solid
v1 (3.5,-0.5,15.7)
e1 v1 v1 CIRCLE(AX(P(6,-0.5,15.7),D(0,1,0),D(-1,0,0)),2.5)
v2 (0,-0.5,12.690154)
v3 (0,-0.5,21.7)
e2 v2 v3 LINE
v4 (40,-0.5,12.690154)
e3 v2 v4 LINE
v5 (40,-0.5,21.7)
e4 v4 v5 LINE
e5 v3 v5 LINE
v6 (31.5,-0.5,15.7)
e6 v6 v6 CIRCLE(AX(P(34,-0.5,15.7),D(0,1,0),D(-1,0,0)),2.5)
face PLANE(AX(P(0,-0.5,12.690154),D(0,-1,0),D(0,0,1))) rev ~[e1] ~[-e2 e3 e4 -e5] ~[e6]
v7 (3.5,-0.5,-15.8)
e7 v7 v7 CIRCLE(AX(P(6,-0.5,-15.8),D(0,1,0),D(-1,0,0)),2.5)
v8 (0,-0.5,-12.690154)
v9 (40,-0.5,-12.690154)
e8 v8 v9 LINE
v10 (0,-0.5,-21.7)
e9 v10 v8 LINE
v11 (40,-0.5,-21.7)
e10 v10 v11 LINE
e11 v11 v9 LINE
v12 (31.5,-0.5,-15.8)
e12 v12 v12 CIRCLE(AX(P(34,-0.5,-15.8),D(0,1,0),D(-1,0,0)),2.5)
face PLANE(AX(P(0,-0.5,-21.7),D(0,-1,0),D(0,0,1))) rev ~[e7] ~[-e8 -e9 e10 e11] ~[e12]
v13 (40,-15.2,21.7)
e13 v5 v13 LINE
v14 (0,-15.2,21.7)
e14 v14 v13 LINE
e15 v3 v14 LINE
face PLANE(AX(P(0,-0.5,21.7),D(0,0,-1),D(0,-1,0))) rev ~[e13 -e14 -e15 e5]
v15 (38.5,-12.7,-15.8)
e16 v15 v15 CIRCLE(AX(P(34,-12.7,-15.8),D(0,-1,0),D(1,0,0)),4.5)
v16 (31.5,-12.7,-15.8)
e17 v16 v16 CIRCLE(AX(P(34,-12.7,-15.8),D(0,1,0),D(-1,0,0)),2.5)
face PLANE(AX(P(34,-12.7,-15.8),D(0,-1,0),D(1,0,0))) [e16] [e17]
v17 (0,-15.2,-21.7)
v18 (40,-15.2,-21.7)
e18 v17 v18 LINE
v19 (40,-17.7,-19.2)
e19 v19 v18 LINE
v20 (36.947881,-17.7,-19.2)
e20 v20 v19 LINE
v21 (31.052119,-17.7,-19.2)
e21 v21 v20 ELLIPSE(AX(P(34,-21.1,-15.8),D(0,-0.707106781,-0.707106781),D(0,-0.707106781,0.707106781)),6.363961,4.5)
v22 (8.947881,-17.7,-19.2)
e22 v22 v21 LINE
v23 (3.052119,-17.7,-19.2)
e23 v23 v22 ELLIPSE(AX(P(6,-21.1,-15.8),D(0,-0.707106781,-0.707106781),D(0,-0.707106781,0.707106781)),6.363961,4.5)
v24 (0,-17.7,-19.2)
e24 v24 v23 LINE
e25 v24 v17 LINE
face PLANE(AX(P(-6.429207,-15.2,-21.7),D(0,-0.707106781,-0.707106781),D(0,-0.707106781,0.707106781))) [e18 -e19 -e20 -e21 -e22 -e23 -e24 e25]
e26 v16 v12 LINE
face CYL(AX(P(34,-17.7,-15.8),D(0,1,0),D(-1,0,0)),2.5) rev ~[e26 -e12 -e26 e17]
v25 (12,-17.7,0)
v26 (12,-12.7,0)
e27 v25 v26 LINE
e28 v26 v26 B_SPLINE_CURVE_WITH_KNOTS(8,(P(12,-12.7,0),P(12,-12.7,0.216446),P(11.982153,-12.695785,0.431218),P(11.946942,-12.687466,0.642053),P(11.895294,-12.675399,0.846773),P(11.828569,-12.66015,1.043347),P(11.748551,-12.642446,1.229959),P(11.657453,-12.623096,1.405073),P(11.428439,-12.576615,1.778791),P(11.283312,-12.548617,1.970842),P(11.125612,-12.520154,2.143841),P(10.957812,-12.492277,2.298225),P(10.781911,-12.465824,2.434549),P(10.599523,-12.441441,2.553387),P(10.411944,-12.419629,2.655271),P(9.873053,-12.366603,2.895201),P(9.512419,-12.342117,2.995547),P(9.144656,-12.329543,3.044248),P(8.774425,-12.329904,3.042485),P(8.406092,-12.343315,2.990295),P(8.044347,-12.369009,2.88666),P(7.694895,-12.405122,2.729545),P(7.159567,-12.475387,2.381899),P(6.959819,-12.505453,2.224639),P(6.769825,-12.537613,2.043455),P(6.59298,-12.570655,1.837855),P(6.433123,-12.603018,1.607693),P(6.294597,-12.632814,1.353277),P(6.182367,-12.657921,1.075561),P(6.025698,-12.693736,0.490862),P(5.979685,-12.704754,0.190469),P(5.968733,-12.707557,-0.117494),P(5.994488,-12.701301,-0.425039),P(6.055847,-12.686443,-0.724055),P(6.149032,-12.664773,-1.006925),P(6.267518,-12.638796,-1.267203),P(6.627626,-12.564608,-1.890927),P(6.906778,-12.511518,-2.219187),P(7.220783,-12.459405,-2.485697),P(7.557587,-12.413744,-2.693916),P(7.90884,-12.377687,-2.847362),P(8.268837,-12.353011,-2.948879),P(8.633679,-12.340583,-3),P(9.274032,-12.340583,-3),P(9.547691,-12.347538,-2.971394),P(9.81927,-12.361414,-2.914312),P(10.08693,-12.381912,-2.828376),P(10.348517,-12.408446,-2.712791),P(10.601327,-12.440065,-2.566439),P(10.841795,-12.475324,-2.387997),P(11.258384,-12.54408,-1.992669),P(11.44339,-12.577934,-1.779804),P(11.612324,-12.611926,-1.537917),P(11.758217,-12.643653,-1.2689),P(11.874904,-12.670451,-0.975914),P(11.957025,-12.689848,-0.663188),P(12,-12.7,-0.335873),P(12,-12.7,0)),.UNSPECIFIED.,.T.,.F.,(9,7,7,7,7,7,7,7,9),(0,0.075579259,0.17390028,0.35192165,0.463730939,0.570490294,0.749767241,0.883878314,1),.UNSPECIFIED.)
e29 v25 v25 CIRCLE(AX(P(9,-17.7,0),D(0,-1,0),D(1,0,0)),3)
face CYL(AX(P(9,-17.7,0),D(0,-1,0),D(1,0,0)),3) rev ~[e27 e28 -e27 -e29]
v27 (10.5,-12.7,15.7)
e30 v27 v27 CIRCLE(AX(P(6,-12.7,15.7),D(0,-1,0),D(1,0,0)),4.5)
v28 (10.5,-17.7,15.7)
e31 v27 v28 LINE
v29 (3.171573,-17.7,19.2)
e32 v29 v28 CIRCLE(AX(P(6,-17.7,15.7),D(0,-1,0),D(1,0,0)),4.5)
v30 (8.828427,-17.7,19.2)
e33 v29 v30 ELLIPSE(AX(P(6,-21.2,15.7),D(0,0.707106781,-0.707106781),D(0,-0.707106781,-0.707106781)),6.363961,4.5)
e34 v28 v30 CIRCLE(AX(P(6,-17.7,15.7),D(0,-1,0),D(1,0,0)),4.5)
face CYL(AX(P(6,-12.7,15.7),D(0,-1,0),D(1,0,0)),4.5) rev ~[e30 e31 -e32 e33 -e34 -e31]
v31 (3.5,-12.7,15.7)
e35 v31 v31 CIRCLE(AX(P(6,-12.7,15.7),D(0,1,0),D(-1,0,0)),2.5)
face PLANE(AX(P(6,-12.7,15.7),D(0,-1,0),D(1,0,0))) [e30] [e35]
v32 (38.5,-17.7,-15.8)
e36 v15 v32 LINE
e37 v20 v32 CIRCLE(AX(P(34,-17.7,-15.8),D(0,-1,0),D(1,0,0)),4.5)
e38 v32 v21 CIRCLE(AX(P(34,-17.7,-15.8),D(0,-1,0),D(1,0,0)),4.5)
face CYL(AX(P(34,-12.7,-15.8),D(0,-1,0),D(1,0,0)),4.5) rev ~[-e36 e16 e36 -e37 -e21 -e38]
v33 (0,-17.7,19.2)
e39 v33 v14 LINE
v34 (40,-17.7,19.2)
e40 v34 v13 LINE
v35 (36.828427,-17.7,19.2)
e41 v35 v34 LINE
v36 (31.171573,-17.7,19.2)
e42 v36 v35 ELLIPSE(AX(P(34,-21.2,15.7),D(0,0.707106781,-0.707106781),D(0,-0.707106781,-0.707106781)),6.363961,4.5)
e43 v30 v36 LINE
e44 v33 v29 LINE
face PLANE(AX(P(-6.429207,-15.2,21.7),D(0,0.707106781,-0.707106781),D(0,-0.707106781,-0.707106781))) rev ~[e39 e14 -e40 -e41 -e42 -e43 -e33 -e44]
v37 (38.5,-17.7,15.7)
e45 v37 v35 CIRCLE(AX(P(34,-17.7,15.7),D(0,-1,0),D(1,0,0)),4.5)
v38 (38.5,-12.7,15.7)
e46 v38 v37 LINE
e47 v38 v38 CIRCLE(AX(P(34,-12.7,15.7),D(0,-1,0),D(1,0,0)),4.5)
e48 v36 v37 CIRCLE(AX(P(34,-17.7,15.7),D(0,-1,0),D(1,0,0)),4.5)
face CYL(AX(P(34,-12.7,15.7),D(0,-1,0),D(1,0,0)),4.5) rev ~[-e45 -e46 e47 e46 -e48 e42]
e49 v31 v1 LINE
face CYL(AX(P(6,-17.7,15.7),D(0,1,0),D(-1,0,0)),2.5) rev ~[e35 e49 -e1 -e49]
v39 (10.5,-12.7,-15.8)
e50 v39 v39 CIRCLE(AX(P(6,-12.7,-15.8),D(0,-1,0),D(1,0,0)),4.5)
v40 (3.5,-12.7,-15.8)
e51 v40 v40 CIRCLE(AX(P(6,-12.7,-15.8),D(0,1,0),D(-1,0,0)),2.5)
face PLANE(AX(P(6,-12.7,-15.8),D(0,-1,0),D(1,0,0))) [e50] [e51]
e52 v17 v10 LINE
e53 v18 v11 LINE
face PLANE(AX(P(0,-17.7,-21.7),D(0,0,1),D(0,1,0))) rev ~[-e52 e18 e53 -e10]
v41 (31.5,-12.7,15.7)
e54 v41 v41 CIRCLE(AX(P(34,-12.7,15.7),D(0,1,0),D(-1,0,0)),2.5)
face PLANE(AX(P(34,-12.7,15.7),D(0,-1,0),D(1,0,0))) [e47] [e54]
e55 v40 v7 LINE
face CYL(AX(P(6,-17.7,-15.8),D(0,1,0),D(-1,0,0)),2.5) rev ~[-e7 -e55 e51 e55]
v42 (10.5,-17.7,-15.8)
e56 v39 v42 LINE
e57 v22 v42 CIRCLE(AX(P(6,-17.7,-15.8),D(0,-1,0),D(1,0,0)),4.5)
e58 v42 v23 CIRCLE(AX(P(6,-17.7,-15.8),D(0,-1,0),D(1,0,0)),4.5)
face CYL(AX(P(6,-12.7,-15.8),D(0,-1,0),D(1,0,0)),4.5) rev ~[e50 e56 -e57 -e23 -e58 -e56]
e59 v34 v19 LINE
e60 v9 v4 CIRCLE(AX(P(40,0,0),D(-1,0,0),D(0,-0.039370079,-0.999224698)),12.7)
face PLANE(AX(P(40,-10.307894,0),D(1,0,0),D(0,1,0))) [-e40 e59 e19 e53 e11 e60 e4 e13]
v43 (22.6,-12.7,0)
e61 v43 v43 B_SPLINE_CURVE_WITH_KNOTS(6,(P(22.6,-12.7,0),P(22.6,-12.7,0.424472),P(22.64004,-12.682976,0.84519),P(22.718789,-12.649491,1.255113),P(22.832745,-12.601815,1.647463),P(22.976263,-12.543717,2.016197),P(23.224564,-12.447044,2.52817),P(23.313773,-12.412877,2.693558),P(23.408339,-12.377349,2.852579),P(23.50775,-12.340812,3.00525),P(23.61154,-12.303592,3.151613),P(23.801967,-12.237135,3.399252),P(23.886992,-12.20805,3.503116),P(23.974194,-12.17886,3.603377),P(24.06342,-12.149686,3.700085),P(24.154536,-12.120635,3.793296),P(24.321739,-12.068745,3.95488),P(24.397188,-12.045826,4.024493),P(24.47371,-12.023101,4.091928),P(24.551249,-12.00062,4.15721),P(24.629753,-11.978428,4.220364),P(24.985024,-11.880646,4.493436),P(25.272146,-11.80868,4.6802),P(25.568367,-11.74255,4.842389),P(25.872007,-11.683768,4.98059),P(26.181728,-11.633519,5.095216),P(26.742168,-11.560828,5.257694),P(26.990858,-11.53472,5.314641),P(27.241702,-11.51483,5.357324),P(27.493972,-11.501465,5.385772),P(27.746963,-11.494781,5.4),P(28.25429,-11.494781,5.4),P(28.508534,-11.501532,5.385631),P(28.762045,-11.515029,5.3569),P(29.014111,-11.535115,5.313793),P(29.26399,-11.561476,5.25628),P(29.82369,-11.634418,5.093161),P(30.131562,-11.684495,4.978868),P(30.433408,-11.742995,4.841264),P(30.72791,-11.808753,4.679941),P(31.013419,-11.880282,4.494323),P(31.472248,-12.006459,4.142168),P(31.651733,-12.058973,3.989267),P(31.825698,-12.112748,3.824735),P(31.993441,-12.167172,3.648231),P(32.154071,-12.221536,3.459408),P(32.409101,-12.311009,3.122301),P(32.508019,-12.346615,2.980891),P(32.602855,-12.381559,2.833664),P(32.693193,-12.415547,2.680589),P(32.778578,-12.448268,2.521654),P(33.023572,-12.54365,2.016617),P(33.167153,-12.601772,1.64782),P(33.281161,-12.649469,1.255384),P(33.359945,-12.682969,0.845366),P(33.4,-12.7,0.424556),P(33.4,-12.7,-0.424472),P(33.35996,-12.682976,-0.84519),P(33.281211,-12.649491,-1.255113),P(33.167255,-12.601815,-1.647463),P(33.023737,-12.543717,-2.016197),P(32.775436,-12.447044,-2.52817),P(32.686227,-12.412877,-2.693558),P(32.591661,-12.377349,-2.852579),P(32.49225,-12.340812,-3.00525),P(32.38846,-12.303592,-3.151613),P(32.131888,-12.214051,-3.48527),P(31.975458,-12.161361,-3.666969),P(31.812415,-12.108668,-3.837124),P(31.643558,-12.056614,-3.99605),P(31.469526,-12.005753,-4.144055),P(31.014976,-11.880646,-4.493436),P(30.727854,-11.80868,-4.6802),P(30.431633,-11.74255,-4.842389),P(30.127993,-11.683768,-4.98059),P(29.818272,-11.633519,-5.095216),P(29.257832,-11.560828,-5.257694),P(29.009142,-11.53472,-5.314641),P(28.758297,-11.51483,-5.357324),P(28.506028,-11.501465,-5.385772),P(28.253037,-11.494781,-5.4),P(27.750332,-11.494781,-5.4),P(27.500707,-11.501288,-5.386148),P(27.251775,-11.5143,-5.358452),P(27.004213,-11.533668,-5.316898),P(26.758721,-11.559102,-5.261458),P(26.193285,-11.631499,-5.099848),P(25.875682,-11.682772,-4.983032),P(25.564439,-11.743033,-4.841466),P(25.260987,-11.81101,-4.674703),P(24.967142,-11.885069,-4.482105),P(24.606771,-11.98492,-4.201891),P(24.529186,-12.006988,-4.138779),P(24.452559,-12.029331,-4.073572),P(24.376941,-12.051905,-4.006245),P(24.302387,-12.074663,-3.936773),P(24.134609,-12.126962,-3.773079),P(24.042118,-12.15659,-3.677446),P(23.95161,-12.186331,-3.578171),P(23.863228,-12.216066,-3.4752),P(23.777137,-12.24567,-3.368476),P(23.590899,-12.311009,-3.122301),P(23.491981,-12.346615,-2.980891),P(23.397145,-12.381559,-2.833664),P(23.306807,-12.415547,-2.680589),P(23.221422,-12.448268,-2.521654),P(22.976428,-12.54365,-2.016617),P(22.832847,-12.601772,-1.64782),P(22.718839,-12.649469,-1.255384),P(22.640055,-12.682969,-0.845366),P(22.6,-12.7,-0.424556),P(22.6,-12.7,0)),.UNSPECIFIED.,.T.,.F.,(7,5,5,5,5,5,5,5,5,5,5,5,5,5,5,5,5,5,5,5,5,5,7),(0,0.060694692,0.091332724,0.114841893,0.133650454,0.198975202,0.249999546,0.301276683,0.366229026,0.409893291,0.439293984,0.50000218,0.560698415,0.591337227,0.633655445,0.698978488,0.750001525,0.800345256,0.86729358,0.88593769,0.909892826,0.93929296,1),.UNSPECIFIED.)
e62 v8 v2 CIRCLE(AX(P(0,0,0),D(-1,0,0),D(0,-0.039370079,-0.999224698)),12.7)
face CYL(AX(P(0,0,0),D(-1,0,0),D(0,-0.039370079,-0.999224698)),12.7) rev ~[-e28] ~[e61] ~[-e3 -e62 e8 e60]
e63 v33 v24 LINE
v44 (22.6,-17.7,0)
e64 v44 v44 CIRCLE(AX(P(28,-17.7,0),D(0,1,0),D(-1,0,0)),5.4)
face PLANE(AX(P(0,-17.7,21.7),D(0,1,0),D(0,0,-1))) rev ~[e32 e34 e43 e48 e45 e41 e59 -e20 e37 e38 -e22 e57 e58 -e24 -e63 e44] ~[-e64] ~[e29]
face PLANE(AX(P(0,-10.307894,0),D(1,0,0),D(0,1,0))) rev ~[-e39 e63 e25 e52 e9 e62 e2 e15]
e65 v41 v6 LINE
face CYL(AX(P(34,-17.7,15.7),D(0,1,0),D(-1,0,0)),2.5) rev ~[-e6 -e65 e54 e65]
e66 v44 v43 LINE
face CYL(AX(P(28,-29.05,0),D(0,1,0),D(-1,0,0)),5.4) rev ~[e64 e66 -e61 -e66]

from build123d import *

# Parameters (mm, degrees)
F1_DEPTH       = 40
F3_D           = 5
F3_CBORE_D     = 9
F3_CBORE_DEPTH = 5
F4_T1_DEPTH    = 52.8584149398
F5_R           = 3
F6_DEPTH       = 17.201
F8_D           = 10.8
F8_DEPTH       = 11.35
F8_TIP         = 3.2446473427


# Not quite as in the source:
# - a fillet or chamfer that OpenCascade refuses, or shapes differently, is made with other operations: its cross-section is extruded or revolved along the edge and cut away or added


with BuildPart() as f1:
    # F0 (on Right) → F1 (new body)
    with BuildSketch(Plane.YZ):
        with BuildLine():
            ThreePointArc((-0.5, -12.6901536634), (-12.7, 0), (-0.5, 12.6901536634))
            Line((-0.5, 12.6901536634), (-0.5, 21.7))
            Line((-0.5, 21.7), (-17.7, 21.7))
            Line((-17.7, 21.7), (-17.7, -21.7))
            Line((-17.7, -21.7), (-0.5, -21.7))
            Line((-0.5, -21.7), (-0.5, -12.6901536634))
        make_face()
    extrude(amount=F1_DEPTH)

    # F3 (through all)
    with Locations(Plane.XZ.offset(17.7)):
        with Locations((6, 15.7), (34, 15.7), (34, -15.8), (6, -15.8)):
            CounterBoreHole(F3_D / 2, F3_CBORE_D / 2, F3_CBORE_DEPTH)

    # F4: chamfer of 2.5 on 2 edges, made by hand

    # F4_s2 → F4_t1 (cut)
    with BuildSketch(Plane.YZ.offset(-6.4292074699)):
        Polygon((-15.2, 21.7), (-17.7, 19.2), (-17.7, 21.7), align=None)
        Polygon((-15.2, -21.7), (-17.7, -19.2), (-17.7, -21.7), align=None)
    extrude(amount=F4_T1_DEPTH, mode=Mode.SUBTRACT)

    # F5 (on face) → F6 (cut, through all)
    with BuildSketch(Plane.XZ.offset(17.7)):
        with Locations((9, 0)):
            Circle(F5_R)
    extrude(amount=-F6_DEPTH, mode=Mode.SUBTRACT)

    # F8
    with Locations(Plane.XZ.offset(17.7)):
        with Locations((28, 0)):
            Hole(F8_D / 2, depth=F8_DEPTH)
            with Locations((0, 0, -(F8_DEPTH + F8_TIP / 2))):  # 118° drill point
                Cone(0, F8_D / 2, F8_TIP, mode=Mode.SUBTRACT)


solid = f1.part
